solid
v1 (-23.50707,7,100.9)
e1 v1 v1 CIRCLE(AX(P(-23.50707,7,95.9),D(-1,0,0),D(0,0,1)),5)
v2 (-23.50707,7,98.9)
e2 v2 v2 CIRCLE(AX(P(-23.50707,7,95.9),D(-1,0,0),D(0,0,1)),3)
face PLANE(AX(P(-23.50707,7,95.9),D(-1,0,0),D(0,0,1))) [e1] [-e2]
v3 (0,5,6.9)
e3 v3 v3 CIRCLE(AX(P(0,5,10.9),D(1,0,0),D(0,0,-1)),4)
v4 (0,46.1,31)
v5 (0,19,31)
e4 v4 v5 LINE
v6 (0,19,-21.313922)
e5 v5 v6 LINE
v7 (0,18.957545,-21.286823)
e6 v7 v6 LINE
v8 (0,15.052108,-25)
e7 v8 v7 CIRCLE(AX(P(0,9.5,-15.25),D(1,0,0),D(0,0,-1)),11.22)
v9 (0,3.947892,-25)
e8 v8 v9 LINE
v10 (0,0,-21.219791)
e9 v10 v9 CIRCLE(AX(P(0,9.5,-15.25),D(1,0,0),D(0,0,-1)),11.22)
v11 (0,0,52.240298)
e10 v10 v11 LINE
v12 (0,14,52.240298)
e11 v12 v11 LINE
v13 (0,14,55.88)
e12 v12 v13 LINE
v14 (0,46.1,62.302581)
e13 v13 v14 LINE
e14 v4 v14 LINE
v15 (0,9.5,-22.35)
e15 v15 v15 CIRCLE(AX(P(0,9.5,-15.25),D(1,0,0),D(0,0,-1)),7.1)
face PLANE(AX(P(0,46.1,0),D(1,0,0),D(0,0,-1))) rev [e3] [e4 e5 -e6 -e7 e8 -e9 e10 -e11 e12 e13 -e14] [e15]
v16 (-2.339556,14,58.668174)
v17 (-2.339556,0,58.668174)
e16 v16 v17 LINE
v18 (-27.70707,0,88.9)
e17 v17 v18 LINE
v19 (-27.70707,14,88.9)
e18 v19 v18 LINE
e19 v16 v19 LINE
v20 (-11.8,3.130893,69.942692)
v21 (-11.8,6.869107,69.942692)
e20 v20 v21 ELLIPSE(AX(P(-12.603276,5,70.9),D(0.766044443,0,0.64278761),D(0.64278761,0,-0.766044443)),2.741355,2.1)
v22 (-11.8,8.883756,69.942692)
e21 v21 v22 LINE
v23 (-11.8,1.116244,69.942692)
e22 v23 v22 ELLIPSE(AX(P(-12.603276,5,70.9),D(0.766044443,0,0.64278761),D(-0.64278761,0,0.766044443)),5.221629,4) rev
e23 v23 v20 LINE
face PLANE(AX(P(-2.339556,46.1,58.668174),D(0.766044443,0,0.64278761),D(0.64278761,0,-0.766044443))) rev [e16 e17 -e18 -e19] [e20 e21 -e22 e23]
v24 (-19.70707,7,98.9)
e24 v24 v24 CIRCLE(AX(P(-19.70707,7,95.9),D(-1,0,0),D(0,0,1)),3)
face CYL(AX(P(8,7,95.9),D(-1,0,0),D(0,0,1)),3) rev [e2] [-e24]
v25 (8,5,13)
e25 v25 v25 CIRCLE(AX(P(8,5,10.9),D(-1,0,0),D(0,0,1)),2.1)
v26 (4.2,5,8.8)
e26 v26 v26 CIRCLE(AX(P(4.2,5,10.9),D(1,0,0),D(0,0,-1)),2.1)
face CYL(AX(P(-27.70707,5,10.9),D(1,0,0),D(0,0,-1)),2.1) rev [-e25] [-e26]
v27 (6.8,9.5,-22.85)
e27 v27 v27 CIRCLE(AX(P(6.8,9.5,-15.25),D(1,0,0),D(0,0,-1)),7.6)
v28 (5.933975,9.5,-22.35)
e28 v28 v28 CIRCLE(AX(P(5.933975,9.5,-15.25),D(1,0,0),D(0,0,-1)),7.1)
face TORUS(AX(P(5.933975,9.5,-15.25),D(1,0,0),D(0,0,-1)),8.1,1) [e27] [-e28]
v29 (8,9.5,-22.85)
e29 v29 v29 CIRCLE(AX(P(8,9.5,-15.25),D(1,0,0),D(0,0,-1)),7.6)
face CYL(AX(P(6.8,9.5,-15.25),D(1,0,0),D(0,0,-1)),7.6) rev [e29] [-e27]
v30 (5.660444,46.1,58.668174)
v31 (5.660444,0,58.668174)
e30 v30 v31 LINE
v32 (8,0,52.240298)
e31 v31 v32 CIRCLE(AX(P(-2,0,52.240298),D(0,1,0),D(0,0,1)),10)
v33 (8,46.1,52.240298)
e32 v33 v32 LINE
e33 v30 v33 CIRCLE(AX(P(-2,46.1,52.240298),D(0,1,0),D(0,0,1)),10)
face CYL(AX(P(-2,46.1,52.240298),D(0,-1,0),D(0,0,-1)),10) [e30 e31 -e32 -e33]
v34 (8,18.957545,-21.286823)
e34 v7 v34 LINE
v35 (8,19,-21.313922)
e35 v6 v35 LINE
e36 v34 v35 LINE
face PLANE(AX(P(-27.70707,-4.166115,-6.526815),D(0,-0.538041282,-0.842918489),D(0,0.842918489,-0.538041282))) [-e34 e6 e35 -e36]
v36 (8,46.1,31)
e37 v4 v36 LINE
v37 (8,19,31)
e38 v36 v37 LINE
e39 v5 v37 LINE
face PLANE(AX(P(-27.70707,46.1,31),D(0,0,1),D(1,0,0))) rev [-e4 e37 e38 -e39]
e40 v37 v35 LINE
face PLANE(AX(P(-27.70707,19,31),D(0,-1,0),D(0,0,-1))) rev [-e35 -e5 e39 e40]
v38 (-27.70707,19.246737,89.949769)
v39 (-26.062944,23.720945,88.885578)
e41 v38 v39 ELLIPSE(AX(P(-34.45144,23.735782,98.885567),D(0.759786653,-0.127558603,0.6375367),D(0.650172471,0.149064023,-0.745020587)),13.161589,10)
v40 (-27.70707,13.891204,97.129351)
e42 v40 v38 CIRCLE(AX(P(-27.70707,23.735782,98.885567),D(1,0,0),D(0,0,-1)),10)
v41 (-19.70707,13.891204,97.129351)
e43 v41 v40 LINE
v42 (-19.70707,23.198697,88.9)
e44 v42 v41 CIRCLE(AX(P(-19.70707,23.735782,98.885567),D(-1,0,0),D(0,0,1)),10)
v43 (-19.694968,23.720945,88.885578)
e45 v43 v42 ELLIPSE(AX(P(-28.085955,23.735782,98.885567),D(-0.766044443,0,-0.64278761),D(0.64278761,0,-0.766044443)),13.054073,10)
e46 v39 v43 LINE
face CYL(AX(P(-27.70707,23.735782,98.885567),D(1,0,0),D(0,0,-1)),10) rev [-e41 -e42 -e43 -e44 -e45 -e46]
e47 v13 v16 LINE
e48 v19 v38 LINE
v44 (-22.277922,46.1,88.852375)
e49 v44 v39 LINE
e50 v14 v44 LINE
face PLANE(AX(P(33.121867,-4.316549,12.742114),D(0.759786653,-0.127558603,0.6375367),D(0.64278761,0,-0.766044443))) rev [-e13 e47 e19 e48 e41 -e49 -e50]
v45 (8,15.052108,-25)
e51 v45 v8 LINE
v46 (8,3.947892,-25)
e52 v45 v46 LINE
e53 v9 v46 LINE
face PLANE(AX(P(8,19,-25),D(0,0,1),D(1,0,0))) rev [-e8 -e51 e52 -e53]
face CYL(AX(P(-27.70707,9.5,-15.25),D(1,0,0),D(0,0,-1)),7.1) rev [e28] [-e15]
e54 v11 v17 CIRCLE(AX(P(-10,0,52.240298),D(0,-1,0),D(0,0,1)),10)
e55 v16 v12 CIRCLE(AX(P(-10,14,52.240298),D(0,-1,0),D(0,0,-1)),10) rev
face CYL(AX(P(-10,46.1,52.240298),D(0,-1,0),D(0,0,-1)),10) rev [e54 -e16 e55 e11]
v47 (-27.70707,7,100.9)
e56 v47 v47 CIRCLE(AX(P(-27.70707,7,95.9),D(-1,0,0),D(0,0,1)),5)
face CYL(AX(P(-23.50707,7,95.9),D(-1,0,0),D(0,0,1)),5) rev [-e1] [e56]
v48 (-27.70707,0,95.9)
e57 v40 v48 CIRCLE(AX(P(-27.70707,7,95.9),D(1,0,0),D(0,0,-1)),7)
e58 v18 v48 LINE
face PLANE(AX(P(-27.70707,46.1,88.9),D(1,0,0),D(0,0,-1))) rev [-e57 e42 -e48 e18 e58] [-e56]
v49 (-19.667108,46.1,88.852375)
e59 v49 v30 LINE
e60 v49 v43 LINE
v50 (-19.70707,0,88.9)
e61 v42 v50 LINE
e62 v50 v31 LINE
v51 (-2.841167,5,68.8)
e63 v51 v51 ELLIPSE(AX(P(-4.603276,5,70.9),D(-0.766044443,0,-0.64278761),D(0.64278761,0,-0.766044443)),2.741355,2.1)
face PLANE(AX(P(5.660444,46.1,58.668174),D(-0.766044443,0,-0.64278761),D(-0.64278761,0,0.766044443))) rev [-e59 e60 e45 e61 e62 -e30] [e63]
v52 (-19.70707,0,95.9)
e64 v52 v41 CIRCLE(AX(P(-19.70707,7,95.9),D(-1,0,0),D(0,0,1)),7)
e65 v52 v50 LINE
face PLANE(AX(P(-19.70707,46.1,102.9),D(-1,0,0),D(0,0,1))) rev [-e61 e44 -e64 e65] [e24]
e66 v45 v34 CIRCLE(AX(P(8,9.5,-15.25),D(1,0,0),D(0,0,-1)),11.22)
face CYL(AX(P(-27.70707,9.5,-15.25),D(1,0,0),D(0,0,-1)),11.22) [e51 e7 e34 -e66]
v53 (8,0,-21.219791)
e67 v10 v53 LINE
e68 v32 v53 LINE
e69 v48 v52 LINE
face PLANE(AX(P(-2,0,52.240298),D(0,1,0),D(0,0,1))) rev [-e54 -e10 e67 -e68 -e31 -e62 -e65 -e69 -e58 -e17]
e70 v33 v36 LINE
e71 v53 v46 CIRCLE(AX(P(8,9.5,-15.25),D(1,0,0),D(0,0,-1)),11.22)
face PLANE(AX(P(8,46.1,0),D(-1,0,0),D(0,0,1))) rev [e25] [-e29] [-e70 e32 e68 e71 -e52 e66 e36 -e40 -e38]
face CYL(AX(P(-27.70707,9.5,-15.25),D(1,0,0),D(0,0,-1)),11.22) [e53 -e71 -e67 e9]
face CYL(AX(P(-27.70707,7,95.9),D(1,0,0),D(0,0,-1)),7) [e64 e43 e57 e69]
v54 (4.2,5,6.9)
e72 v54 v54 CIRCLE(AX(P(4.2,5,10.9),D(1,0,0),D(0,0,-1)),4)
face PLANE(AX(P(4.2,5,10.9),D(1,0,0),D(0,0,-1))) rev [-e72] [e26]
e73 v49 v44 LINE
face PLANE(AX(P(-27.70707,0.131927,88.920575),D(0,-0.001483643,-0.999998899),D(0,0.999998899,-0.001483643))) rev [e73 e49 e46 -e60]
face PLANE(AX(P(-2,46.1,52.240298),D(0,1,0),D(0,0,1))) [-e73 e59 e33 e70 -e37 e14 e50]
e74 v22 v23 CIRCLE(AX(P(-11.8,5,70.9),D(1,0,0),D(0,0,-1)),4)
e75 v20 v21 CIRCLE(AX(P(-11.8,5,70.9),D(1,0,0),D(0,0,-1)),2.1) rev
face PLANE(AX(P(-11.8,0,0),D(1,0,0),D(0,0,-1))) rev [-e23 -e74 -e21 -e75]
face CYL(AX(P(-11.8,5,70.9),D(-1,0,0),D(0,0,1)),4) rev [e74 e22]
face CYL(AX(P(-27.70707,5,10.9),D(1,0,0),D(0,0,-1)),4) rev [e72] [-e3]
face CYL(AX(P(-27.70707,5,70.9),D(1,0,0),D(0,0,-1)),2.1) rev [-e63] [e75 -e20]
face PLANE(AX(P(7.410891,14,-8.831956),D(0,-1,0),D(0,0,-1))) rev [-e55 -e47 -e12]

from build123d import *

# Parameters (mm, degrees)
BOSS_EXTRUDE1_DEPTH     = 46.1
CUT_EXTRUDE1_START      = -8
CUT_EXTRUDE1_DEPTH      = 35.707069821
SKETCH3_R               = 5
CUT_EXTRUDE2_DEPTH      = 4.2
SKETCH4_R               = 3
CUT_EXTRUDE3_DEPTH      = 118.073974259
CUT_EXTRUDE4_START      = -33.042265264
CUT_EXTRUDE4_DEPTH      = 39.042265264
CUT_EXTRUDE4_START_2    = 14
CUT_EXTRUDE4_2_DEPTH    = 32.1
CUT_EXTRUDE4_START_3    = -47.726546034
CUT_EXTRUDE4_3_DEPTH    = 7.708156307
SKETCH8_W               = 31
SKETCH8_H               = 27.1
CUT_EXTRUDE5_DEPTH      = 119.273474775
SKETCH9_W               = 8
SKETCH9_H               = 25
BOSS_EXTRUDE2_DEPTH     = 19
SKETCH10_R              = 7.1
CUT_EXTRUDE6_DEPTH      = 119.273474775
SKETCH11_R              = 7.6
CUT_EXTRUDE7_DEPTH      = 1.2
CUT_EXTRUDE8_DEPTH      = 119.273474775
CUT_EXTRUDE8_DEPTH_BACK = 119.273474775
SKETCH12_R              = 2.1
CUT_EXTRUDE9_DEPTH      = 4.2
CUT_EXTRUDE9_DEPTH_BACK = 119.273474775
CUT_EXTRUDE9_START      = -8
SKETCH14_R              = 4
SKETCH14_R_2            = 2.1
CUT_EXTRUDE10_START     = -24
SKETCH14_3_R            = 4
CUT_EXTRUDE10_DEPTH     = 4.2
FILLET13_R              = 10
FILLET14_R              = 1


with BuildPart() as part:
    # Sketch1 → Boss-Extrude1 (new body)
    with BuildSketch(Plane(origin=(0, 0, 0), x_dir=(1, 0, 0), z_dir=(0, 1, 0))):
        with BuildLine():
            Line((0, 0), (8, 0))
            Line((8, 0), (8, -52.240297657))
            ThreePointArc((8, -52.240297657), (7.396926208, -55.660499091), (5.660444431, -58.668173754))
            Line((5.660444431, -58.668173754), (-19.707069821, -88.9))
            Line((-19.707069821, -88.9), (-19.707069821, -102.9))
            Line((-19.707069821, -102.9), (-27.707069821, -102.9))
            Line((-27.707069821, -102.9), (-27.707069821, -88.9))
            Line((-27.707069821, -88.9), (-2.339555569, -58.668173754))
            ThreePointArc((-2.339555569, -58.668173754), (-0.603073792, -55.660499091), (0, -52.240297657))
            Line((0, -52.240297657), (0, 0))
        make_face()
    extrude(amount=BOSS_EXTRUDE1_DEPTH)

    # Cut-Extrude1: read off the stored shape, not the designer's step
    # Cut-Extrude1 outline → Cut-Extrude1 (cut)
    with BuildSketch(Plane(origin=(-19.707069821, 0, 0), x_dir=(0, 0, -1), z_dir=(1, 0, 0)).offset(CUT_EXTRUDE1_START)):
        with BuildLine():
            ThreePointArc((-95.9, 0), (-100.849747468, 2.050252532), (-102.9, 7))
            Line((-102.9, 7), (-102.9, 0))
            Line((-102.9, 0), (-95.9, 0))
        make_face()
        with BuildLine():
            ThreePointArc((-102.9, 7), (-100.849747468, 11.949747468), (-95.9, 14))
            Line((-95.9, 14), (-88.9, 14))
            Line((-88.9, 14), (-88.852375001, 46.1))
            Line((-88.852375001, 46.1), (-102.9, 46.1))
            Line((-102.9, 46.1), (-102.9, 7))
        make_face()
    extrude(amount=CUT_EXTRUDE1_DEPTH, mode=Mode.SUBTRACT)

    # Sketch3 → Cut-Extrude2 (cut)
    with BuildSketch(Plane.ZY.offset(27.707069821)):
        with Locations((95.9, 7)):
            Circle(SKETCH3_R)
    extrude(amount=-CUT_EXTRUDE2_DEPTH, mode=Mode.SUBTRACT)

    # Sketch4 → Cut-Extrude3 (cut, through all)
    with BuildSketch(Plane.ZY.offset(23.507069821)):
        with Locations((95.9, 7)):
            Circle(SKETCH4_R)
    extrude(amount=-CUT_EXTRUDE3_DEPTH, mode=Mode.SUBTRACT)

    # Cut-Extrude4: read off the stored shape, not the designer's step
    # Cut-Extrude4 outline → Cut-Extrude4 (cut)
    with BuildSketch(Plane(origin=(-51.917191151, 0, 61.872499072), x_dir=(0.7660444431189772, 0, 0.6427876096865404), z_dir=(-0.6427876096865403, 0, 0.7660444431189771)).offset(CUT_EXTRUDE4_START)):
        Polygon((35.918971629, 46.1), (35.918971629, 14), (40.047327174, 46.1), align=None)
    extrude(amount=CUT_EXTRUDE4_DEPTH, mode=Mode.SUBTRACT)

    # Cut-Extrude4 2 outline → Cut-Extrude4 2 (cut)
    with BuildSketch(Plane(origin=(0, 0, 0), x_dir=(1, 0, 0), z_dir=(0, 1, 0)).offset(CUT_EXTRUDE4_START_2)):
        with BuildLine():
            Line((-3.162503825, -59.648925294), (0, -62.302581087))
            Line((0, -62.302581087), (0, -52.240297657))
            ThreePointArc((0, -52.240297657), (-0.603073792, -55.66049909), (-2.339555569, -58.668173754))
            Line((-2.339555569, -58.668173754), (-3.162503825, -59.648925294))
        make_face()
    extrude(amount=CUT_EXTRUDE4_2_DEPTH, mode=Mode.SUBTRACT)

    # Cut-Extrude4 3 outline → Cut-Extrude4 3 (add)
    with BuildSketch(Plane(origin=(0, 0, 0), x_dir=(0.7660444431189768, 0, 0.6427876096865408), z_dir=(0.6427876096865408, 0, -0.7660444431189768)).offset(CUT_EXTRUDE4_START_3)):
        Polygon((40.047327174, -46.1), (40.047327174, -14), (35.918971629, -14), align=None)
    extrude(amount=CUT_EXTRUDE4_3_DEPTH)

    # Sketch8 → Cut-Extrude5 (cut, through all)
    with BuildSketch(Plane(origin=(8, 0, 0), x_dir=(0, 0, -1), z_dir=(1, 0, 0))):
        with Locations((-15.5, 32.55)):
            Rectangle(SKETCH8_W, SKETCH8_H)
    extrude(amount=-CUT_EXTRUDE5_DEPTH, mode=Mode.SUBTRACT)

    # Sketch9 → Boss-Extrude2 (add)
    with BuildSketch(Plane(origin=(0, 0, 0), x_dir=(1, 0, 0), z_dir=(0, 1, 0))):
        with Locations((4, 12.5)):
            Rectangle(SKETCH9_W, SKETCH9_H)
    extrude(amount=BOSS_EXTRUDE2_DEPTH)

    # Sketch10 → Cut-Extrude6 (cut, through all)
    with BuildSketch(Plane(origin=(8, 0, 0), x_dir=(0, 0, -1), z_dir=(1, 0, 0))):
        with BuildLine():
            ThreePointArc((25, 3.947892292), (23.353975422, 1.740233099), (21.219790616, 0))
            Line((21.219790616, 0), (25, 0))
            Line((25, 0), (25, 3.947892292))
        make_face()
        with BuildLine():
            ThreePointArc((21.286823186, 18.957545444), (23.381362589, 17.231063475), (25, 15.052107708))
            Line((25, 15.052107708), (25, 19))
            Line((25, 19), (21.313922252, 19))
            Line((21.313922252, 19), (21.286823186, 18.957545444))
        make_face()
        with Locations((15.25, 9.5)):
            Circle(SKETCH10_R)
    extrude(amount=-CUT_EXTRUDE6_DEPTH, mode=Mode.SUBTRACT)

    # Sketch11 → Cut-Extrude7 (cut)
    with BuildSketch(Plane(origin=(8, 0, 0), x_dir=(0, 0, -1), z_dir=(1, 0, 0))):
        with Locations((15.25, 9.5)):
            Circle(SKETCH11_R)
    extrude(amount=-CUT_EXTRUDE7_DEPTH, mode=Mode.SUBTRACT)

    # Sketch12 → Cut-Extrude8 (cut, two sides: drawn at the far end of the back side and taken through both)
    with BuildSketch(Plane(origin=(8, 0, 0), x_dir=(0, 0, -1), z_dir=(1, 0, 0)).offset(-CUT_EXTRUDE8_DEPTH_BACK)):
        with Locations((-70.9, 5)):
            Circle(SKETCH12_R)
        with Locations((-10.9, 5)):
            Circle(SKETCH12_R)
    extrude(amount=CUT_EXTRUDE8_DEPTH + CUT_EXTRUDE8_DEPTH_BACK, mode=Mode.SUBTRACT)

    # Sketch14 → Cut-Extrude9 (cut, two sides: drawn at the far end of the back side and taken through both)
    with BuildSketch(Plane(origin=(8, 0, 0), x_dir=(0, 0, -1), z_dir=(1, 0, 0)).offset(CUT_EXTRUDE9_START - CUT_EXTRUDE9_DEPTH_BACK)):
        with Locations((-10.9, 5)):
            Circle(SKETCH14_R)
        with Locations((-10.9, 5)):
            Circle(SKETCH14_R_2, mode=Mode.SUBTRACT)
    extrude(amount=CUT_EXTRUDE9_DEPTH + CUT_EXTRUDE9_DEPTH_BACK, mode=Mode.SUBTRACT)

    # Sketch14<3> → Cut-Extrude10 (cut)
    with BuildSketch(Plane(origin=(8, 0, 0), x_dir=(0, 0, -1), z_dir=(1, 0, 0)).offset(CUT_EXTRUDE10_START)):
        with Locations((-70.9, 5)):
            Circle(SKETCH14_3_R)
    extrude(amount=CUT_EXTRUDE10_DEPTH, mode=Mode.SUBTRACT)

    # Fillet13
    # the kernel refuses this fillet: 10 mm, written as the material it adds along each edge
    with BuildSketch(Plane(origin=(-27.707069821, 14, 88.9), x_dir=(0, 0.9999988994008282, -0.0014836431957626689), z_dir=(1, 0, 0))) as fillet13_piece_1_section:
        with BuildLine():
            CenterArc((9.720956062, 10), FILLET13_R, 190.199837756, 79.800162244)
            Line((-0.121005032, 8.229180466), (-1.105201142, 8.052098513))
            ThreePointArc((-1.105201142, 8.052098513), (-1.010384402, 6.998508652), (-0.999998899, -0.001483643))
            Line((-0.999998899, -0.001483643), (0, -1))
            Line((0, -1), (9.720956062, -1))
            Line((9.720956062, -1), (9.720956062, 0))
        make_face()
    fillet13_piece_1 = extrude(amount=8, mode=Mode.PRIVATE)
    fillet13_piece_1 = split(fillet13_piece_1, bisect_by=Plane(origin=(-27.707069822, 14, 88.9), z_dir=(0.75978665319281, -0.12755860295201663, 0.6375367004675092)), keep=Keep.TOP, mode=Mode.PRIVATE)
    fillet13_piece_1 = split(fillet13_piece_1, bisect_by=Plane(origin=(-27.707069821, 14, 88.9), z_dir=(0.7660444431189771, 0, 0.6427876096865404)), keep=Keep.TOP, mode=Mode.PRIVATE)
    fillet13_piece_1 = split(fillet13_piece_1, bisect_by=Plane(origin=(-23.012477111, 14, 92.839231012), z_dir=(-0.7660444431189769, 0, -0.6427876096865407)), keep=Keep.TOP, mode=Mode.PRIVATE)
    add(fillet13_piece_1)
    with BuildSketch(Plane(origin=(-27.707069821, 14, 88.9), x_dir=(0, 0.9999988994008282, -0.0014836431957626689), z_dir=(1, 0, 0))) as fillet13_piece_2_section:
        with BuildLine():
            CenterArc((9.720956062, 10), FILLET13_R, 190.199837756, 79.800162244)
            Line((-0.121005032, 8.229180466), (-1.105201142, 8.052098513))
            ThreePointArc((-1.105201142, 8.052098513), (-1.010384402, 6.998508652), (-0.999998899, -0.001483643))
            Line((-0.999998899, -0.001483643), (0, -1))
            Line((0, -1), (9.720956062, -1))
            Line((9.720956062, -1), (9.720956062, 0))
        make_face()
    fillet13_piece_2 = extrude(amount=8, mode=Mode.PRIVATE)
    fillet13_piece_2 = split(fillet13_piece_2, bisect_by=Plane(origin=(-23.012477111, 14, 92.839231012), z_dir=(0.7660444431189769, 0, 0.6427876096865407)), keep=Keep.TOP, mode=Mode.PRIVATE)
    add(fillet13_piece_2)
    with BuildSketch(Plane(origin=(-27.707069821, 14, 88.9), x_dir=(0, 0.9999988994008282, -0.0014836431957626689), z_dir=(1, 0, 0))) as fillet13_piece_3_section:
        with BuildLine():
            CenterArc((9.720956062, 10), FILLET13_R, 190.199837756, 79.800162244)
            Line((-0.121005032, 8.229180466), (-1.105201142, 8.052098513))
            ThreePointArc((-1.105201142, 8.052098513), (-1.010384402, 6.998508652), (-0.999998899, -0.001483643))
            Line((-0.999998899, -0.001483643), (0, -1))
            Line((0, -1), (9.720956062, -1))
            Line((9.720956062, -1), (9.720956062, 0))
        make_face()
    fillet13_piece_3 = extrude(amount=32.302390155, mode=Mode.PRIVATE)
    fillet13_piece_3 = split(fillet13_piece_3, bisect_by=Plane(origin=(-19.707069821, 14, 88.9), z_dir=(1, 0, 0)), keep=Keep.TOP, mode=Mode.PRIVATE)
    fillet13_piece_3 = split(fillet13_piece_3, bisect_by=Plane(origin=(-23.012477111, 14, 92.839231012), z_dir=(-0.7660444431189769, 0, -0.6427876096865407)), keep=Keep.TOP, mode=Mode.PRIVATE)
    add(fillet13_piece_3)

    # Fillet14
    # the kernel refuses this fillet: 1 mm, written as the material it takes off along each edge
    with BuildSketch(Plane(origin=(6.8, 9.5, -15.25), x_dir=(0, 0, -1), z_dir=(0, -1, 0))) as fillet14_piece_1:
        with BuildLine():
            CenterArc((8.1, -0.866025404), FILLET14_R, 120, 60)
            Line((7.1, -0.866025404), (7.08, -0.866025404))
            Line((7.08, -0.866025404), (7.08, 0))
            Line((7.08, 0), (7.1, 0.02))
            ThreePointArc((7.1, 0.02), (7.35, 0.02), (7.59, 0.017320508))
            Line((7.59, 0.017320508), (7.6, 0))
        make_face()
    revolve(axis=Axis((6.8, 9.5, -15.25), (1, 0, 0)), mode=Mode.SUBTRACT)


solid = part.part
